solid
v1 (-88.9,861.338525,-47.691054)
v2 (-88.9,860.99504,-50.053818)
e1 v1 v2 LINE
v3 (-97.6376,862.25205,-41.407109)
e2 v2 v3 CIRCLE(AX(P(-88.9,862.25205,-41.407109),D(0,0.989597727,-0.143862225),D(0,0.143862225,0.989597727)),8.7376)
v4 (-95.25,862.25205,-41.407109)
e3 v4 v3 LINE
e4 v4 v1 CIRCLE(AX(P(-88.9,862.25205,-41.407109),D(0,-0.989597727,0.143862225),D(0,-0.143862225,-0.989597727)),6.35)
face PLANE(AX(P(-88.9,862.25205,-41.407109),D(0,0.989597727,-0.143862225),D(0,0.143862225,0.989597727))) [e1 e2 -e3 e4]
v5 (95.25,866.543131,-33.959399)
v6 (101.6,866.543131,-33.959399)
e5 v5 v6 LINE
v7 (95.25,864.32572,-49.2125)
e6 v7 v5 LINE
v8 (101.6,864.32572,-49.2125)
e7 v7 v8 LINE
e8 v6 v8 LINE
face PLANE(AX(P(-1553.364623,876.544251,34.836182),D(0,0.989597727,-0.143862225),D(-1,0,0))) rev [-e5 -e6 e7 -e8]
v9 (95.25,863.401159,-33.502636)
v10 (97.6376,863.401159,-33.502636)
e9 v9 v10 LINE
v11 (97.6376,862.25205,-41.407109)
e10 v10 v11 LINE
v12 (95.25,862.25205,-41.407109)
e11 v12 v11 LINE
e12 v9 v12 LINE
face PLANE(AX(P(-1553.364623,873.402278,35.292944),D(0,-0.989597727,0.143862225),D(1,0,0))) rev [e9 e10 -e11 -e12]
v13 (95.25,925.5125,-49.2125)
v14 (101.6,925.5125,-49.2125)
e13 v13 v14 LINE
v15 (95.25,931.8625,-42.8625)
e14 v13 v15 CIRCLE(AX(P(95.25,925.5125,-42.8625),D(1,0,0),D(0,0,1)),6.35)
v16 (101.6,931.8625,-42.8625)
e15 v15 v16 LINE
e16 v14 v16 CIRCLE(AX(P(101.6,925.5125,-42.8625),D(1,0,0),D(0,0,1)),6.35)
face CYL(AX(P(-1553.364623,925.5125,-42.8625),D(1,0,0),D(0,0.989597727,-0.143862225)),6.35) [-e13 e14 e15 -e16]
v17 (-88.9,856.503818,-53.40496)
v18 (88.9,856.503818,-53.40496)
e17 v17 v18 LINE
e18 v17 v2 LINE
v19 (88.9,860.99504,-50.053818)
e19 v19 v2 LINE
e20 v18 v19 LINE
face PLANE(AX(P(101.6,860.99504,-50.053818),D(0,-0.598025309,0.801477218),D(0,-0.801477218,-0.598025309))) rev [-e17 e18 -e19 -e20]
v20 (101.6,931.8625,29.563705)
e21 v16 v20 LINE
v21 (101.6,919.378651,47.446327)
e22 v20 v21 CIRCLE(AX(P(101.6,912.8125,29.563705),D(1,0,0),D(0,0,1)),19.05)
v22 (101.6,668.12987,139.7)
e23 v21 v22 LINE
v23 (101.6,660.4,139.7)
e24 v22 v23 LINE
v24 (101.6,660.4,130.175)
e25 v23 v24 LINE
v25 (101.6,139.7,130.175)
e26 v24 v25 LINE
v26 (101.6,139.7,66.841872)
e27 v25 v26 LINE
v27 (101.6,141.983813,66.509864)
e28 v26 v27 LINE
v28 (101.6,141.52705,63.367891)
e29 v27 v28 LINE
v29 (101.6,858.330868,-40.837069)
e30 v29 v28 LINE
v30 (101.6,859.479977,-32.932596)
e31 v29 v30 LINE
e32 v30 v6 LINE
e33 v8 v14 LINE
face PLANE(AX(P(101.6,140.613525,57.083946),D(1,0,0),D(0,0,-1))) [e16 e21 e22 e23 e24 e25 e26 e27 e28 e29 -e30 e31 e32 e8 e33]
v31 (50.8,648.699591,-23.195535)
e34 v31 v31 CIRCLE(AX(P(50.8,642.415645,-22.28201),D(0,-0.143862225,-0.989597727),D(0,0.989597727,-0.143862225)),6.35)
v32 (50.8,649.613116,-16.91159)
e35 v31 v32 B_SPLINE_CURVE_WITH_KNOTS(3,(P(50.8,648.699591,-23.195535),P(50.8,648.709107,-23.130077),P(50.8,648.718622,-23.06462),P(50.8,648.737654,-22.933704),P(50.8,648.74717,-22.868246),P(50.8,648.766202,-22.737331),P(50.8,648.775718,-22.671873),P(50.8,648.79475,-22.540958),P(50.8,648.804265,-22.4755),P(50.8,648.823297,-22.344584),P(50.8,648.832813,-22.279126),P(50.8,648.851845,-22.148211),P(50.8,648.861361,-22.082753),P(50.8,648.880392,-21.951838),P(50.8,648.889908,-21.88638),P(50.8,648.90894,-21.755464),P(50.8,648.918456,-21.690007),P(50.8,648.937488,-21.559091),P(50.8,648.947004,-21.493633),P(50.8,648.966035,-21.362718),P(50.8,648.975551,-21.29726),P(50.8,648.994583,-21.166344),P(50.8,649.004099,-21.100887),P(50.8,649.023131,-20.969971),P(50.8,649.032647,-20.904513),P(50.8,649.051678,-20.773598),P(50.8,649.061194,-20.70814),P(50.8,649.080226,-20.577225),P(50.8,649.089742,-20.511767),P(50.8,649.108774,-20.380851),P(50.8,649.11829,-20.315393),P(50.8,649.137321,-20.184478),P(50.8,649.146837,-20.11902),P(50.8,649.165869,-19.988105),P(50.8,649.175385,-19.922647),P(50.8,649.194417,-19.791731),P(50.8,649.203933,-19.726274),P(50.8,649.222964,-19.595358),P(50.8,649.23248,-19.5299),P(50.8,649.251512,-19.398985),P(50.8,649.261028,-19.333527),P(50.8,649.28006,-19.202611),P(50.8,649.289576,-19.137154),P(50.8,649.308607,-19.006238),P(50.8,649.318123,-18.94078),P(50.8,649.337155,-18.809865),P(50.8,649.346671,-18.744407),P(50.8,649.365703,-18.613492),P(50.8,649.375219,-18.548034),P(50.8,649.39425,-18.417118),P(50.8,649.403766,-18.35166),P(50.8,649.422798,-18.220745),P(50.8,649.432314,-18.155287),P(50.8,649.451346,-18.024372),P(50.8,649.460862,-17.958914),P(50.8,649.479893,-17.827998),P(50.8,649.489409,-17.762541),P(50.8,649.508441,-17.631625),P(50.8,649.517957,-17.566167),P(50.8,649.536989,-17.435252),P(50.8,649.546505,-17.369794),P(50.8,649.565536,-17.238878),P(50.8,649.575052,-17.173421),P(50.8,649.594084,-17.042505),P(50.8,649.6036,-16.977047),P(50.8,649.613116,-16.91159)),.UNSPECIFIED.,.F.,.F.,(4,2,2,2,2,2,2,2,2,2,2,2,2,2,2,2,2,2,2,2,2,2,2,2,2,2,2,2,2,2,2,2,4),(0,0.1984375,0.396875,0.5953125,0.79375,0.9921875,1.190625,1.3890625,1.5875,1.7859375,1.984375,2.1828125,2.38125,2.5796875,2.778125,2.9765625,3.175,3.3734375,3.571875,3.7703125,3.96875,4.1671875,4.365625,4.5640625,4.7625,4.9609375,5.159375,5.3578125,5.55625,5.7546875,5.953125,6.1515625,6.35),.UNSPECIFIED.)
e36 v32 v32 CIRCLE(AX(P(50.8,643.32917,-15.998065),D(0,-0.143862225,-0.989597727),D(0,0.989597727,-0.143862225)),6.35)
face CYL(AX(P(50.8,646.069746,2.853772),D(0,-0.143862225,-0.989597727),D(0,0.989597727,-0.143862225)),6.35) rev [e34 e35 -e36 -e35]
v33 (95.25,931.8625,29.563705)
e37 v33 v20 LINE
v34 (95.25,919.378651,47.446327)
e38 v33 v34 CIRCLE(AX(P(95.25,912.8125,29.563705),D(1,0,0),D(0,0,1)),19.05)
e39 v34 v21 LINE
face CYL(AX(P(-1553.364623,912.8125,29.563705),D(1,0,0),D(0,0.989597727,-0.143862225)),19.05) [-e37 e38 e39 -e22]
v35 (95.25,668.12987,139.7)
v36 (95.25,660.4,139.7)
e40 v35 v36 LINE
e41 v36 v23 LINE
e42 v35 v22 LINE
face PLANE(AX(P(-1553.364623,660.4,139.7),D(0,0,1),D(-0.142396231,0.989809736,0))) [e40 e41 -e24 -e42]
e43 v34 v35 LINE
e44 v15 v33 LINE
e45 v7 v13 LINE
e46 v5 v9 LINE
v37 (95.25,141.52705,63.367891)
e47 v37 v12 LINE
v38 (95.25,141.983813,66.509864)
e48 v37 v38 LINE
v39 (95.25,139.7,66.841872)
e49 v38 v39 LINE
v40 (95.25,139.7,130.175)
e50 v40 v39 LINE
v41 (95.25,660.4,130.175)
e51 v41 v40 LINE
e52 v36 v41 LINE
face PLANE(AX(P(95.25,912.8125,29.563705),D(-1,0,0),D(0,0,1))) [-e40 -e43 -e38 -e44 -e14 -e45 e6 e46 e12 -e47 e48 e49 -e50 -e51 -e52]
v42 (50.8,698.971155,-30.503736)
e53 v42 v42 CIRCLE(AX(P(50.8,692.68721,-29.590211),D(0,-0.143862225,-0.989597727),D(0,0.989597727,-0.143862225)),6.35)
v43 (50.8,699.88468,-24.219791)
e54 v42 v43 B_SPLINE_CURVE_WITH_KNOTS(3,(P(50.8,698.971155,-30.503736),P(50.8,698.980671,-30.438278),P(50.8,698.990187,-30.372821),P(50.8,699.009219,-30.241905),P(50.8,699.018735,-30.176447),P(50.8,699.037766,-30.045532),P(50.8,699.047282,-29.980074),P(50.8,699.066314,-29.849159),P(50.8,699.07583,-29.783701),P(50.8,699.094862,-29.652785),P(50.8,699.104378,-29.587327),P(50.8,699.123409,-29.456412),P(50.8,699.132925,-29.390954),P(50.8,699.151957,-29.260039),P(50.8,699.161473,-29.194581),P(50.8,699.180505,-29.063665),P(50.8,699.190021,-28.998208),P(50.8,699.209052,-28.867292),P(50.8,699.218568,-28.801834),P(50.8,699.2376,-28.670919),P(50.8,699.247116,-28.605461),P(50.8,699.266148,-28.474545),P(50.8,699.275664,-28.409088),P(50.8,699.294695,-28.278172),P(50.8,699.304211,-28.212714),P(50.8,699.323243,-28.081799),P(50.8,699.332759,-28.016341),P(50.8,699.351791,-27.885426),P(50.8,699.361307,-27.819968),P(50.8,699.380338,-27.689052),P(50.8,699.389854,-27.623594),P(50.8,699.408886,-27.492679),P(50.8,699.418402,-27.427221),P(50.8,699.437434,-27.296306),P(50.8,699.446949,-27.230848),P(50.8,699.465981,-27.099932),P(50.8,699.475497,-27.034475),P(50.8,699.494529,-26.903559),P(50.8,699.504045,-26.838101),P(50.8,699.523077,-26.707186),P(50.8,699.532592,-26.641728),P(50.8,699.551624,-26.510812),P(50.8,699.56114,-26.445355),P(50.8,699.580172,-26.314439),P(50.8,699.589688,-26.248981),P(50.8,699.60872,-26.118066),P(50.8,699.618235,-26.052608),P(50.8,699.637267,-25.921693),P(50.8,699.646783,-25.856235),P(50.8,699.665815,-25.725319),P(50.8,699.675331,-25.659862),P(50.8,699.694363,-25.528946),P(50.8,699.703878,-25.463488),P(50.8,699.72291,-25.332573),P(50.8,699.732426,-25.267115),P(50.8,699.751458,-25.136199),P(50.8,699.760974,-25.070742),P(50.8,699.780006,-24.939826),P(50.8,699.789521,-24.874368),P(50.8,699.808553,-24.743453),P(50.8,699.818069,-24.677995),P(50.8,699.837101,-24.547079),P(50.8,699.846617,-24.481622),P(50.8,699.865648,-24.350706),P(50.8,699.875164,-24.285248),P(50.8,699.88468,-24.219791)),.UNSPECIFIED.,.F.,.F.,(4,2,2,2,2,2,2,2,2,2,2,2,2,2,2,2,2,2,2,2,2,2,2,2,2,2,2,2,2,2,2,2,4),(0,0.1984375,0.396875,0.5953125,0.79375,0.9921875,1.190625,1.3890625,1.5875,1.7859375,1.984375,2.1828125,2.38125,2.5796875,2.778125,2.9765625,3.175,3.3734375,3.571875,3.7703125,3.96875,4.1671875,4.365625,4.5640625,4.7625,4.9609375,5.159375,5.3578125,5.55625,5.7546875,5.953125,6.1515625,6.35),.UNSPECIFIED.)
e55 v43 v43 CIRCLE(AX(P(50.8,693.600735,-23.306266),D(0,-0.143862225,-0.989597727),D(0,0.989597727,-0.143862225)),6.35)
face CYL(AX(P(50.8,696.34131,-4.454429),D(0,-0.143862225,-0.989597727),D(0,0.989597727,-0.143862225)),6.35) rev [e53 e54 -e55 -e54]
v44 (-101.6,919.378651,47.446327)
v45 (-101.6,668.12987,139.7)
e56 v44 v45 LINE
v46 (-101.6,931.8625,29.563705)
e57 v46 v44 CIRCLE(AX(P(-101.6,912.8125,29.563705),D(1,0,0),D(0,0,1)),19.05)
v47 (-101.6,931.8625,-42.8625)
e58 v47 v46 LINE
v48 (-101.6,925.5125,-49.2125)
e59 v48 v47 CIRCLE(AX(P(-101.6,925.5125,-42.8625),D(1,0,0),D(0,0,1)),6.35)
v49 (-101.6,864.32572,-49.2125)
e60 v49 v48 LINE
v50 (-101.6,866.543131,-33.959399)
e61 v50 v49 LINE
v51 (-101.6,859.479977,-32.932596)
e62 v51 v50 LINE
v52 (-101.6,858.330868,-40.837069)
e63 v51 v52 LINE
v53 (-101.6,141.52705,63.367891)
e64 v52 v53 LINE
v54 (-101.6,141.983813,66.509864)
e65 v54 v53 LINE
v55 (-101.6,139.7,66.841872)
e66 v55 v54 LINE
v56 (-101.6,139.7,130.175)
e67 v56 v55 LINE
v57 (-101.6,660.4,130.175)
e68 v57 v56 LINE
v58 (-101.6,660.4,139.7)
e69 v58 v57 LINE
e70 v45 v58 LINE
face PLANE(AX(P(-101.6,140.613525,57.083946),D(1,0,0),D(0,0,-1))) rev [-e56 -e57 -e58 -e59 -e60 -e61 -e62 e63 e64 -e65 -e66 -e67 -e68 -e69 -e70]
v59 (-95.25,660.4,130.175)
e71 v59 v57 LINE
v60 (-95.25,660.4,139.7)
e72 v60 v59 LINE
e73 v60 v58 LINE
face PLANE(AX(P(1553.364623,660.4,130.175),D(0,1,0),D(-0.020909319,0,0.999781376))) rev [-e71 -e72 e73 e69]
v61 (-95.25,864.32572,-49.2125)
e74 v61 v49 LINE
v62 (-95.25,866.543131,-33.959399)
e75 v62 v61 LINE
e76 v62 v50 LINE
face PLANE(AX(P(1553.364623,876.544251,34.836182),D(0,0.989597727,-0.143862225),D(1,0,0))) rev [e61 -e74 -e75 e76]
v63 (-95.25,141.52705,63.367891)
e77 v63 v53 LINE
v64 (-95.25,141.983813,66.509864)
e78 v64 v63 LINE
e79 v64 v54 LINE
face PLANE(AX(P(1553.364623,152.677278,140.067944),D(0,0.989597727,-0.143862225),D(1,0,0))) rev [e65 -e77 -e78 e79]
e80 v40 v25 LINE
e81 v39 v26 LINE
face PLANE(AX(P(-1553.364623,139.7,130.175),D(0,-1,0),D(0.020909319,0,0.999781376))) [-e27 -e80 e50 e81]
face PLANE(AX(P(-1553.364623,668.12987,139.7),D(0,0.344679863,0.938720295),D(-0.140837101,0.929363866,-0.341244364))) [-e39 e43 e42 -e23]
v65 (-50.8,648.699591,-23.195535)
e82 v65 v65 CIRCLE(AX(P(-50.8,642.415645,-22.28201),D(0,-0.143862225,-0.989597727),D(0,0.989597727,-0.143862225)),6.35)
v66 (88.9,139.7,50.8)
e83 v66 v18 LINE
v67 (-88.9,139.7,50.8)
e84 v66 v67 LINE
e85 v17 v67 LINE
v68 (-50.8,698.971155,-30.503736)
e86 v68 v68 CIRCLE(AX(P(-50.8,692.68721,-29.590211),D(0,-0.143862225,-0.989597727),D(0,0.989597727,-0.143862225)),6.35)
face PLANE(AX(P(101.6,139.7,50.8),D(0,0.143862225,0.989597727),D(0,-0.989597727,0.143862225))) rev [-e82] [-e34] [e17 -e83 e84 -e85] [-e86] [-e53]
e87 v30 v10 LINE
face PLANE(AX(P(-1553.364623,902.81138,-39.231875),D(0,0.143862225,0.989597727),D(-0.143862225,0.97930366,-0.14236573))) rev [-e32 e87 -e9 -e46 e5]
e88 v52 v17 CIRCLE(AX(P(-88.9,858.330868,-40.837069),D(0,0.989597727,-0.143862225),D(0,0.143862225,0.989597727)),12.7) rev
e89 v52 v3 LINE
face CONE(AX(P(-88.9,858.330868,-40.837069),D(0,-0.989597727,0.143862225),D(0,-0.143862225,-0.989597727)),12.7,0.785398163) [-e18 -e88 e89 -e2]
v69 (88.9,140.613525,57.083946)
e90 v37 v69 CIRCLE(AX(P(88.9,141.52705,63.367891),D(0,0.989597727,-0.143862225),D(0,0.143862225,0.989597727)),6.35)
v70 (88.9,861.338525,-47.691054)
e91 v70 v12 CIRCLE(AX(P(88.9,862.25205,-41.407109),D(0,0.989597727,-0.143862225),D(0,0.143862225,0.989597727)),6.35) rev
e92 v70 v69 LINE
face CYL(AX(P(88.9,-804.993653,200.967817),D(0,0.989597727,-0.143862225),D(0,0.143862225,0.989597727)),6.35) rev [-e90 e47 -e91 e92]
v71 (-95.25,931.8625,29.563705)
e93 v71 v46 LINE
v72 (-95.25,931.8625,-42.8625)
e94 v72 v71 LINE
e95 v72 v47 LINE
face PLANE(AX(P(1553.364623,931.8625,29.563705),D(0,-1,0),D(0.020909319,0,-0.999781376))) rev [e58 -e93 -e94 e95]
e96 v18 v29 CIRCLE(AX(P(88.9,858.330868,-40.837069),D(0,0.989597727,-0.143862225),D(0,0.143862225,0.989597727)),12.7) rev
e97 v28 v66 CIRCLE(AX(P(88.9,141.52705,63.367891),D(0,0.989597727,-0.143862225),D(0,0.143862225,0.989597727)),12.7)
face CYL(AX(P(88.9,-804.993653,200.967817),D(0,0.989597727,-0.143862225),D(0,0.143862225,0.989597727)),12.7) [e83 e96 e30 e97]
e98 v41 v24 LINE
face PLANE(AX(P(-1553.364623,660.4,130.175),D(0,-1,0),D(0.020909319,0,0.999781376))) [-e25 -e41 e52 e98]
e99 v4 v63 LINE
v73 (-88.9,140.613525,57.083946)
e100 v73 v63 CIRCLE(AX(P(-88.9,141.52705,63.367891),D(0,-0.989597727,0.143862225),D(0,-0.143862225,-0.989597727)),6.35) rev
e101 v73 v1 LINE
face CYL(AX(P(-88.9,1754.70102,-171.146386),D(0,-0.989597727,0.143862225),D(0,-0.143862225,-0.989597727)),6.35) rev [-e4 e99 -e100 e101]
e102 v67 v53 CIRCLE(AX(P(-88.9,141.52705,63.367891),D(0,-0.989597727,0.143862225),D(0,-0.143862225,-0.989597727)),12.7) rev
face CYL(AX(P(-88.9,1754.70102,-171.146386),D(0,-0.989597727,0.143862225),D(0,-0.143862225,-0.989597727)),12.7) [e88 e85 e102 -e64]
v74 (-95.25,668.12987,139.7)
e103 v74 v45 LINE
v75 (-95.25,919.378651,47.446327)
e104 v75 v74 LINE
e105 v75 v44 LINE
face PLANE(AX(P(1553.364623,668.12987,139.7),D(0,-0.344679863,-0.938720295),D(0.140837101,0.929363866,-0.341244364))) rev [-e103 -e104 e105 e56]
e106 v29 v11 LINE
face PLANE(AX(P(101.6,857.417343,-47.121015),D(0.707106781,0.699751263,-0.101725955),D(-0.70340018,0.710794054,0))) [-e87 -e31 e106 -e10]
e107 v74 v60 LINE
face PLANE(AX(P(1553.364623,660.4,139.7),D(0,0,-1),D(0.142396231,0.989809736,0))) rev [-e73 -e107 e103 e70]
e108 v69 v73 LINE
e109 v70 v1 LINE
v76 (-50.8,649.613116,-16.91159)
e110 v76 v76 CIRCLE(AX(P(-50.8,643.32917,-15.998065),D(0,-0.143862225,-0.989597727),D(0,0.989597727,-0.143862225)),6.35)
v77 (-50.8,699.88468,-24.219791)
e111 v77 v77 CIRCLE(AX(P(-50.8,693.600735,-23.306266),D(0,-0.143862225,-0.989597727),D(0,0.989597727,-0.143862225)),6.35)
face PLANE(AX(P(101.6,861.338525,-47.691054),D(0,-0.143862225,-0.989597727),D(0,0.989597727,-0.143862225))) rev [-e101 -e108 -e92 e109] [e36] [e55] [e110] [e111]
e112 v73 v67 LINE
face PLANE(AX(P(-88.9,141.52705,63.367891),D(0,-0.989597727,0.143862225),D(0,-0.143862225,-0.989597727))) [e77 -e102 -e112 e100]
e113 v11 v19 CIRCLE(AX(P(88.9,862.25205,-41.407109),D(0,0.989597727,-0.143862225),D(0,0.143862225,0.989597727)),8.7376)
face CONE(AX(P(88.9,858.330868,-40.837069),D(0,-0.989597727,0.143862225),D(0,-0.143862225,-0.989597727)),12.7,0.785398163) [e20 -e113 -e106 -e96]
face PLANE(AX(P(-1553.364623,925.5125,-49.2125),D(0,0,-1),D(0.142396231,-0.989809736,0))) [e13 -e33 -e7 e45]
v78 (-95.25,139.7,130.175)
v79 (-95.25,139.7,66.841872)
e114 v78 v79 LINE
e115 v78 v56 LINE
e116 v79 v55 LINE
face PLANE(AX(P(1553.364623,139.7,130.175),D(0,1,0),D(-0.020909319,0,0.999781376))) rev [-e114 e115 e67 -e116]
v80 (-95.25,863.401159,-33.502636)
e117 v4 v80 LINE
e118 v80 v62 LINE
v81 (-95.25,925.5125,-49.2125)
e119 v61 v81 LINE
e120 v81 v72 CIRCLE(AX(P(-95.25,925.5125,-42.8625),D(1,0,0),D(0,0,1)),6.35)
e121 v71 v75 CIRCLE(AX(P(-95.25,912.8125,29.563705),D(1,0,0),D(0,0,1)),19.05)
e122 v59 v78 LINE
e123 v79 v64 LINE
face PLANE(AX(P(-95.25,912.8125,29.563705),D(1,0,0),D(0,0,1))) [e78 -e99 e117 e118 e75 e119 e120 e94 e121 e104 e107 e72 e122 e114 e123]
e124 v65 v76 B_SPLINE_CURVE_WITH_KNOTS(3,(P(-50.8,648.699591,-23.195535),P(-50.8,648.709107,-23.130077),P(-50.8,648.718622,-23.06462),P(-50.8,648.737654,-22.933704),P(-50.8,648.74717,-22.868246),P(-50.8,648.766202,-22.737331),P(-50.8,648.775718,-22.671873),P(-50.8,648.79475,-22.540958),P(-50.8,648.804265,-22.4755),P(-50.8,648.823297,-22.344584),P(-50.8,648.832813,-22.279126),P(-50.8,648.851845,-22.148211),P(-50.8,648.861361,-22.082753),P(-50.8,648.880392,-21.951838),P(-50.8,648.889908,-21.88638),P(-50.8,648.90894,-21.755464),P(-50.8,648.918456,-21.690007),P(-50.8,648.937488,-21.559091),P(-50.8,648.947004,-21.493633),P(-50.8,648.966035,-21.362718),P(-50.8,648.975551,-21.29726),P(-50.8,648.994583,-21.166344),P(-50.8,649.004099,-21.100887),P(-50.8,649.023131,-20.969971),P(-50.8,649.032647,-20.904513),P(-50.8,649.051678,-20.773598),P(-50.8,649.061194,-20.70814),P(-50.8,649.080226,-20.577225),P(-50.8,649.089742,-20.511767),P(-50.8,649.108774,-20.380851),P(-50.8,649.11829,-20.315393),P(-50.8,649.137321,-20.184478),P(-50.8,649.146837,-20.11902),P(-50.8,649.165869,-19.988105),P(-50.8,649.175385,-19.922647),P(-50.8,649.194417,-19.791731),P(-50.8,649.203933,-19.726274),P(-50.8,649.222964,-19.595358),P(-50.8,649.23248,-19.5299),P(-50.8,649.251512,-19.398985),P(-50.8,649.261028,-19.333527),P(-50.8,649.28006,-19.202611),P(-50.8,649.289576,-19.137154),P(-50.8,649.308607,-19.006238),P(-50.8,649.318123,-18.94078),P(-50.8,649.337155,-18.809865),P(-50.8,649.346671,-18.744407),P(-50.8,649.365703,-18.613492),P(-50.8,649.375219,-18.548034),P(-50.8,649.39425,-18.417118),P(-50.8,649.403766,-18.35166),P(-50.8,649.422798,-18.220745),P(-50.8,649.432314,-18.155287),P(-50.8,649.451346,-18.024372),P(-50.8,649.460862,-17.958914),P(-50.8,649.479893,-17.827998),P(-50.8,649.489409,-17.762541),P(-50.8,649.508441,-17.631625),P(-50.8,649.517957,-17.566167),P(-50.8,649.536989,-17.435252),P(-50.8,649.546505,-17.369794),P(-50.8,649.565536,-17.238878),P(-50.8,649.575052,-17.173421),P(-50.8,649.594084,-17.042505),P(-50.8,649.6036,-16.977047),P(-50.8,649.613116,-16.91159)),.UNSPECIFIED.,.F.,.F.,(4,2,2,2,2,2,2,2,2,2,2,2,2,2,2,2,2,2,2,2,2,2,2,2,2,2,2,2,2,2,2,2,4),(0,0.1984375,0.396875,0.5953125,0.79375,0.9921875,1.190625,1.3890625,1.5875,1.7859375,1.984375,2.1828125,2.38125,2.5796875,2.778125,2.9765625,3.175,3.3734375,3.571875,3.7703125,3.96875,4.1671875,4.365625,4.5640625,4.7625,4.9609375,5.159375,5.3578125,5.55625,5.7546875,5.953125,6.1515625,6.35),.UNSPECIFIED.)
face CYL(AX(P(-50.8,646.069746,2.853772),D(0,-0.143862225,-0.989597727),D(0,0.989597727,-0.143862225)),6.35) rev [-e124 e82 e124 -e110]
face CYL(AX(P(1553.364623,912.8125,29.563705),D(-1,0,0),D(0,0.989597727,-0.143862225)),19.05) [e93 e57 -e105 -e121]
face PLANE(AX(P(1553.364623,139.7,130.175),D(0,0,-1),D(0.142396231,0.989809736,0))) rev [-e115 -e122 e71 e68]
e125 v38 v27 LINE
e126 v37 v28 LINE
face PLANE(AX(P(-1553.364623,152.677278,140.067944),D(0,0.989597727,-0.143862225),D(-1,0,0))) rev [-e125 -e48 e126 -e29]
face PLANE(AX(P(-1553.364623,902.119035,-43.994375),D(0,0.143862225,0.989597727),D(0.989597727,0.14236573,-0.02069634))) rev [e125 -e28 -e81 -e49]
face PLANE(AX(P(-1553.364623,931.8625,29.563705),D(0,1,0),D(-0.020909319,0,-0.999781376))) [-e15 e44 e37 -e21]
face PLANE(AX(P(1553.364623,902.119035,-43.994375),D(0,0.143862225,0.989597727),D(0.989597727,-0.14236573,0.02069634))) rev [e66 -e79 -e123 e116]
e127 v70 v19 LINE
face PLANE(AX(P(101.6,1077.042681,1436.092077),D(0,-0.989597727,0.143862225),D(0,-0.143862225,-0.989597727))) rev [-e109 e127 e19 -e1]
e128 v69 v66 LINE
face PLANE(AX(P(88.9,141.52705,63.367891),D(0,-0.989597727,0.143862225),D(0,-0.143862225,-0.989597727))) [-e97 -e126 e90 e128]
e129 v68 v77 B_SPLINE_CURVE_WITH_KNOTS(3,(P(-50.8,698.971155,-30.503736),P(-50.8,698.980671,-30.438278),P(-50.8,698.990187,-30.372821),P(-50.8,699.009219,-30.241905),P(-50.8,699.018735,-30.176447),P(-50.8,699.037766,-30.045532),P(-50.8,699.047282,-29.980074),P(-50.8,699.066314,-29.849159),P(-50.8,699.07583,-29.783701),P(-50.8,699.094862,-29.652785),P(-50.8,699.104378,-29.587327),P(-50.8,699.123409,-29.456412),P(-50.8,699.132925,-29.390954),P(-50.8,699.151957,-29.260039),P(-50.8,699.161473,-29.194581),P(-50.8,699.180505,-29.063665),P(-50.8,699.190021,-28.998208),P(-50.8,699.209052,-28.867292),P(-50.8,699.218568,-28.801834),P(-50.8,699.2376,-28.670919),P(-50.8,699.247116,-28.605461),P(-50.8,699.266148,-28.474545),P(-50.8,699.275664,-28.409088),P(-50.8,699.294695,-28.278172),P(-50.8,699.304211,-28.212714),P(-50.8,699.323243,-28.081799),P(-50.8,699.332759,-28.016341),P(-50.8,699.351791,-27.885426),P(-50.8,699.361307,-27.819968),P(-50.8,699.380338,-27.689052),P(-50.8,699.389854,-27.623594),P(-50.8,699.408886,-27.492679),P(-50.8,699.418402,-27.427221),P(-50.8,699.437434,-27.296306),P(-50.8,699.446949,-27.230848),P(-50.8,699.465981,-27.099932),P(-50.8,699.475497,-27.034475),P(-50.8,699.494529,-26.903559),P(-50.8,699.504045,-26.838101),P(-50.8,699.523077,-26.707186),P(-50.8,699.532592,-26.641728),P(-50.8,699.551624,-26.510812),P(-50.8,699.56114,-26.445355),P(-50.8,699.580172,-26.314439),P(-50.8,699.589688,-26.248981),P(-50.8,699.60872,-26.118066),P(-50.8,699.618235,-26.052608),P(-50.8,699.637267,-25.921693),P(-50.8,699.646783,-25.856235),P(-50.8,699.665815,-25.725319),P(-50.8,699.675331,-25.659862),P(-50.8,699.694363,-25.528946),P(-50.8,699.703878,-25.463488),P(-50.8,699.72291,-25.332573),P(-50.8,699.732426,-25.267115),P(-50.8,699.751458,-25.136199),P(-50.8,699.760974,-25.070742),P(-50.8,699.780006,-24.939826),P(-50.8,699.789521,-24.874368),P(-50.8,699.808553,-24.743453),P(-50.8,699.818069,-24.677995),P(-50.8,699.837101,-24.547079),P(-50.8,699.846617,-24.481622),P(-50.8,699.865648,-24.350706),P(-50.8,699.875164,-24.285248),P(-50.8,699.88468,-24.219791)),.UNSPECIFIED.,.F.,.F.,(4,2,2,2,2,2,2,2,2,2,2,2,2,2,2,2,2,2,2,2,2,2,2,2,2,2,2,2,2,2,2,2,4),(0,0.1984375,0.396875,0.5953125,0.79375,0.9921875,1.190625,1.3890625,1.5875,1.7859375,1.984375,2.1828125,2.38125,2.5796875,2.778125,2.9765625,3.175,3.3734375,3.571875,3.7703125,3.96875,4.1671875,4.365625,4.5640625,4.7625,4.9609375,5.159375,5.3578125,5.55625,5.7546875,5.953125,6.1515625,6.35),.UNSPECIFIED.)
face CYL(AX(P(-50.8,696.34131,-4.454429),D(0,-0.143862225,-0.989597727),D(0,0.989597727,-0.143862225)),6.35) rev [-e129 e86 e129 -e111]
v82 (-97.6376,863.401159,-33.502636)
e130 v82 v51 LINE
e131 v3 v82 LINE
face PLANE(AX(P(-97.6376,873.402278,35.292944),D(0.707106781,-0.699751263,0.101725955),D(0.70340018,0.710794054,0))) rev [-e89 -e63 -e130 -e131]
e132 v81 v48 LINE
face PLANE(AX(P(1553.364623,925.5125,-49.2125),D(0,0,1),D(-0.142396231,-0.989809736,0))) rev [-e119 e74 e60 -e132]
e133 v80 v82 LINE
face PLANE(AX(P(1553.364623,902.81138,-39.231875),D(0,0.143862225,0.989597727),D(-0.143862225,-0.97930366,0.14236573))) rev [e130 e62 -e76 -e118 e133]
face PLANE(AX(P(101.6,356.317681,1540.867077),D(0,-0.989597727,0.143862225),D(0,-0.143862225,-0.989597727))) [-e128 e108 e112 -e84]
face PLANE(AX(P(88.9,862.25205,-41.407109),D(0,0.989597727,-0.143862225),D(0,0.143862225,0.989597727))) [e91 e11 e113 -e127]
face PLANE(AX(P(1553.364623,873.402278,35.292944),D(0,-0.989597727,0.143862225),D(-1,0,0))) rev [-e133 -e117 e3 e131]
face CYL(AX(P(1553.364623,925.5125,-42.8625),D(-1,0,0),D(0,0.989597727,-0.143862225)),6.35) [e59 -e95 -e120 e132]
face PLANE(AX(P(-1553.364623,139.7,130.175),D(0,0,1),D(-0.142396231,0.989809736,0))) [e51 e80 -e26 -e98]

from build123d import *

# Parameters (mm, degrees)
BOSS_EXTRUDE1_DEPTH    = 101.6
BOSS_EXTRUDE2_DEPTH    = 6.35
CUT_EXTRUDE1_START     = 70.369117279
CUT_EXTRUDE1_OUTLINE_R = 6.35
CUT_EXTRUDE1_DEPTH     = 6.35
FLATTEN_BENDS1_START   = 128.994638868
FLATTEN_BENDS1_DEPTH   = 733.419948548
FLATTEN_BENDS1_START_2 = 859.239587416
FLATTEN_BENDS1_2_DEPTH = 3.175
FLATTEN_BENDS1_START_3 = 128.630782005
FLATTEN_BENDS1_3_DEPTH = 2.307819383
FLATTEN_BENDS1_START_4 = 130.938601388
FLATTEN_BENDS1_4_DEPTH = 728.300986028
CHAMFER1_SIZE          = 3.9624


# Read off the part's stored shape, not the designer's step: Cut-Extrude1, Flatten-Bends1
with BuildPart() as part:
    # Sketch11 → Boss-Extrude1 (new, symmetric)
    with BuildSketch(Plane(origin=(0, 0, 0), x_dir=(0, 0, -1), z_dir=(1, 0, 0))):
        Polygon((-57.083945563, 140.613525126), (-50.8, 139.7), (53.975, 860.425), (47.691054437, 861.338525126), align=None)
    extrude(amount=BOSS_EXTRUDE1_DEPTH, both=True)

    # Sketch8 → Boss-Extrude2 (add)
    with BuildSketch(Plane(origin=(101.6, 0, 0), x_dir=(0, 0, -1), z_dir=(1, 0, 0))):
        with BuildLine():
            Line((-130.175, 139.7), (-57.216748776, 139.7))
            Line((-57.216748776, 139.7), (-57.083945563, 140.613525126))
            Line((-57.083945563, 140.613525126), (-50.8, 139.7))
            Line((-50.8, 139.7), (53.975, 860.425))
            Line((53.975, 860.425), (49.2125, 861.117345815))
            Line((49.2125, 861.117345815), (49.2125, 925.5125))
            ThreePointArc((49.2125, 925.5125), (47.352628061, 930.002628061), (42.8625, 931.8625))
            Line((42.8625, 931.8625), (-29.563705158, 931.8625))
            ThreePointArc((-29.563705158, 931.8625), (-40.468229819, 928.432802235), (-47.446326779, 919.378651382))
            Line((-47.446326779, 919.378651382), (-139.7, 668.12987028))
            Line((-139.7, 668.12987028), (-139.7, 660.4))
            Line((-139.7, 660.4), (-130.175, 660.4))
            Line((-130.175, 660.4), (-130.175, 139.7))
        make_face()
    boss_extrude2 = extrude(amount=-BOSS_EXTRUDE2_DEPTH)

    # Mirror1: Boss-Extrude2 across plane
    add(boss_extrude2.mirror(Plane(origin=(0, 0, 0), x_dir=(0, 0, 1), z_dir=(1, 0, 0))))

    # Cut-Extrude1 outline → Cut-Extrude1 (cut)
    with BuildSketch(Plane(origin=(0, 0, 0), x_dir=(1, 0, 0), z_dir=(0, 0.143862224560971, 0.989597726525465)).offset(CUT_EXTRUDE1_START)):
        with Locations((50.8, 638.938601388)):
            Circle(CUT_EXTRUDE1_OUTLINE_R)
        with Locations((50.8, 689.738601388)):
            Circle(CUT_EXTRUDE1_OUTLINE_R)
        with Locations((-50.8, 638.938601388)):
            Circle(CUT_EXTRUDE1_OUTLINE_R)
        with Locations((-50.8, 689.738601388)):
            Circle(CUT_EXTRUDE1_OUTLINE_R)
    extrude(amount=CUT_EXTRUDE1_DEPTH, mode=Mode.SUBTRACT)

    # Flatten-Bends1 outline → Flatten-Bends1 (cut)
    with BuildSketch(Plane(origin=(0, 0, 0), x_dir=(1, 0, 0), z_dir=(0, 0.989597726525465, -0.143862224560971)).offset(FLATTEN_BENDS1_START)):
        with BuildLine():
            ThreePointArc((-101.6, -83.069117279), (-97.880256121, -74.088861158), (-88.9, -70.369117279))
            Line((-88.9, -70.369117279), (-101.6, -70.369117279))
            Line((-101.6, -70.369117279), (-101.6, -83.069117279))
        make_face()
        with BuildLine():
            Line((101.6, -70.369117279), (88.9, -70.369117279))
            ThreePointArc((88.9, -70.369117279), (97.880256121, -74.088861158), (101.6, -83.069117279))
            Line((101.6, -83.069117279), (101.6, -70.369117279))
        make_face()
    extrude(amount=FLATTEN_BENDS1_DEPTH, mode=Mode.SUBTRACT)

    # Flatten-Bends1 2 outline → Flatten-Bends1 2 (cut)
    with BuildSketch(Plane(origin=(0, 0, 0), x_dir=(1, 0, 0), z_dir=(0, 0.989597726525465, -0.143862224560971)).offset(FLATTEN_BENDS1_START_2)):
        with BuildLine():
            Line((-101.6, -83.069117279), (-101.6, -91.05667886))
            Line((-101.6, -91.05667886), (-95.25, -91.05667886))
            Line((-95.25, -91.05667886), (-95.25, -76.719117279))
            Line((-95.25, -76.719117279), (95.25, -76.719117279))
            Line((95.25, -76.719117279), (95.25, -91.05667886))
            Line((95.25, -91.05667886), (101.6, -91.05667886))
            Line((101.6, -91.05667886), (101.6, -83.069117279))
            ThreePointArc((101.6, -83.069117279), (97.880256121, -74.088861158), (88.9, -70.369117279))
            Line((88.9, -70.369117279), (-88.9, -70.369117279))
            ThreePointArc((-88.9, -70.369117279), (-97.880256121, -74.088861158), (-101.6, -83.069117279))
        make_face()
    extrude(amount=FLATTEN_BENDS1_2_DEPTH, mode=Mode.SUBTRACT)

    # Flatten-Bends1 3 outline → Flatten-Bends1 3 (cut)
    with BuildSketch(Plane(origin=(0, 0, 0), x_dir=(1, 0, 0), z_dir=(0, 0.989597726525465, -0.143862224560971)).offset(FLATTEN_BENDS1_START_3)):
        with BuildLine():
            Line((-101.6, -83.069117279), (-101.6, -86.244117279))
            Line((-101.6, -86.244117279), (-95.25, -86.244117279))
            Line((-95.25, -86.244117279), (-95.25, -76.719117279))
            Line((-95.25, -76.719117279), (-99.898522628, -76.719117279))
            ThreePointArc((-99.898522628, -76.719117279), (-101.167257994, -79.782115406), (-101.6, -83.069117279))
        make_face()
        with BuildLine():
            Line((95.25, -76.719117279), (95.25, -86.244117279))
            Line((95.25, -86.244117279), (101.6, -86.244117279))
            Line((101.6, -86.244117279), (101.6, -83.069117279))
            ThreePointArc((101.6, -83.069117279), (101.167257994, -79.782115406), (99.898522628, -76.719117279))
            Line((99.898522628, -76.719117279), (95.25, -76.719117279))
        make_face()
    extrude(amount=FLATTEN_BENDS1_3_DEPTH, mode=Mode.SUBTRACT)

    # Flatten-Bends1 4 outline → Flatten-Bends1 4 (add)
    with BuildSketch(Plane(origin=(0, 0, 0), x_dir=(1, 0, 0), z_dir=(0, 0.989597726525465, -0.143862224560971)).offset(FLATTEN_BENDS1_START_4)):
        with BuildLine():
            Line((-95.25, -76.719117279), (-95.25, -83.069117279))
            ThreePointArc((-95.25, -83.069117279), (-93.390128061, -78.578989218), (-88.9, -76.719117279))
            Line((-88.9, -76.719117279), (-95.25, -76.719117279))
        make_face()
        with BuildLine():
            Line((95.25, -76.719117279), (88.9, -76.719117279))
            ThreePointArc((88.9, -76.719117279), (93.390128061, -78.578989218), (95.25, -83.069117279))
            Line((95.25, -83.069117279), (95.25, -76.719117279))
        make_face()
    extrude(amount=FLATTEN_BENDS1_4_DEPTH)

    # Chamfer1
    chamfer1_edges = [part.edges().sort_by_distance(p)[0] for p in [
        (101.6, 862.826604441, -37.454872482),
        (0, 860.425, -53.975),
        (97.880256121, 860.960130629, -50.293949914),
        (-97.880256121, 860.960130629, -50.293949914),
        (-101.6, 862.826604441, -37.454872482),
    ]]
    chamfer(chamfer1_edges, length=CHAMFER1_SIZE)


solid = part.part
